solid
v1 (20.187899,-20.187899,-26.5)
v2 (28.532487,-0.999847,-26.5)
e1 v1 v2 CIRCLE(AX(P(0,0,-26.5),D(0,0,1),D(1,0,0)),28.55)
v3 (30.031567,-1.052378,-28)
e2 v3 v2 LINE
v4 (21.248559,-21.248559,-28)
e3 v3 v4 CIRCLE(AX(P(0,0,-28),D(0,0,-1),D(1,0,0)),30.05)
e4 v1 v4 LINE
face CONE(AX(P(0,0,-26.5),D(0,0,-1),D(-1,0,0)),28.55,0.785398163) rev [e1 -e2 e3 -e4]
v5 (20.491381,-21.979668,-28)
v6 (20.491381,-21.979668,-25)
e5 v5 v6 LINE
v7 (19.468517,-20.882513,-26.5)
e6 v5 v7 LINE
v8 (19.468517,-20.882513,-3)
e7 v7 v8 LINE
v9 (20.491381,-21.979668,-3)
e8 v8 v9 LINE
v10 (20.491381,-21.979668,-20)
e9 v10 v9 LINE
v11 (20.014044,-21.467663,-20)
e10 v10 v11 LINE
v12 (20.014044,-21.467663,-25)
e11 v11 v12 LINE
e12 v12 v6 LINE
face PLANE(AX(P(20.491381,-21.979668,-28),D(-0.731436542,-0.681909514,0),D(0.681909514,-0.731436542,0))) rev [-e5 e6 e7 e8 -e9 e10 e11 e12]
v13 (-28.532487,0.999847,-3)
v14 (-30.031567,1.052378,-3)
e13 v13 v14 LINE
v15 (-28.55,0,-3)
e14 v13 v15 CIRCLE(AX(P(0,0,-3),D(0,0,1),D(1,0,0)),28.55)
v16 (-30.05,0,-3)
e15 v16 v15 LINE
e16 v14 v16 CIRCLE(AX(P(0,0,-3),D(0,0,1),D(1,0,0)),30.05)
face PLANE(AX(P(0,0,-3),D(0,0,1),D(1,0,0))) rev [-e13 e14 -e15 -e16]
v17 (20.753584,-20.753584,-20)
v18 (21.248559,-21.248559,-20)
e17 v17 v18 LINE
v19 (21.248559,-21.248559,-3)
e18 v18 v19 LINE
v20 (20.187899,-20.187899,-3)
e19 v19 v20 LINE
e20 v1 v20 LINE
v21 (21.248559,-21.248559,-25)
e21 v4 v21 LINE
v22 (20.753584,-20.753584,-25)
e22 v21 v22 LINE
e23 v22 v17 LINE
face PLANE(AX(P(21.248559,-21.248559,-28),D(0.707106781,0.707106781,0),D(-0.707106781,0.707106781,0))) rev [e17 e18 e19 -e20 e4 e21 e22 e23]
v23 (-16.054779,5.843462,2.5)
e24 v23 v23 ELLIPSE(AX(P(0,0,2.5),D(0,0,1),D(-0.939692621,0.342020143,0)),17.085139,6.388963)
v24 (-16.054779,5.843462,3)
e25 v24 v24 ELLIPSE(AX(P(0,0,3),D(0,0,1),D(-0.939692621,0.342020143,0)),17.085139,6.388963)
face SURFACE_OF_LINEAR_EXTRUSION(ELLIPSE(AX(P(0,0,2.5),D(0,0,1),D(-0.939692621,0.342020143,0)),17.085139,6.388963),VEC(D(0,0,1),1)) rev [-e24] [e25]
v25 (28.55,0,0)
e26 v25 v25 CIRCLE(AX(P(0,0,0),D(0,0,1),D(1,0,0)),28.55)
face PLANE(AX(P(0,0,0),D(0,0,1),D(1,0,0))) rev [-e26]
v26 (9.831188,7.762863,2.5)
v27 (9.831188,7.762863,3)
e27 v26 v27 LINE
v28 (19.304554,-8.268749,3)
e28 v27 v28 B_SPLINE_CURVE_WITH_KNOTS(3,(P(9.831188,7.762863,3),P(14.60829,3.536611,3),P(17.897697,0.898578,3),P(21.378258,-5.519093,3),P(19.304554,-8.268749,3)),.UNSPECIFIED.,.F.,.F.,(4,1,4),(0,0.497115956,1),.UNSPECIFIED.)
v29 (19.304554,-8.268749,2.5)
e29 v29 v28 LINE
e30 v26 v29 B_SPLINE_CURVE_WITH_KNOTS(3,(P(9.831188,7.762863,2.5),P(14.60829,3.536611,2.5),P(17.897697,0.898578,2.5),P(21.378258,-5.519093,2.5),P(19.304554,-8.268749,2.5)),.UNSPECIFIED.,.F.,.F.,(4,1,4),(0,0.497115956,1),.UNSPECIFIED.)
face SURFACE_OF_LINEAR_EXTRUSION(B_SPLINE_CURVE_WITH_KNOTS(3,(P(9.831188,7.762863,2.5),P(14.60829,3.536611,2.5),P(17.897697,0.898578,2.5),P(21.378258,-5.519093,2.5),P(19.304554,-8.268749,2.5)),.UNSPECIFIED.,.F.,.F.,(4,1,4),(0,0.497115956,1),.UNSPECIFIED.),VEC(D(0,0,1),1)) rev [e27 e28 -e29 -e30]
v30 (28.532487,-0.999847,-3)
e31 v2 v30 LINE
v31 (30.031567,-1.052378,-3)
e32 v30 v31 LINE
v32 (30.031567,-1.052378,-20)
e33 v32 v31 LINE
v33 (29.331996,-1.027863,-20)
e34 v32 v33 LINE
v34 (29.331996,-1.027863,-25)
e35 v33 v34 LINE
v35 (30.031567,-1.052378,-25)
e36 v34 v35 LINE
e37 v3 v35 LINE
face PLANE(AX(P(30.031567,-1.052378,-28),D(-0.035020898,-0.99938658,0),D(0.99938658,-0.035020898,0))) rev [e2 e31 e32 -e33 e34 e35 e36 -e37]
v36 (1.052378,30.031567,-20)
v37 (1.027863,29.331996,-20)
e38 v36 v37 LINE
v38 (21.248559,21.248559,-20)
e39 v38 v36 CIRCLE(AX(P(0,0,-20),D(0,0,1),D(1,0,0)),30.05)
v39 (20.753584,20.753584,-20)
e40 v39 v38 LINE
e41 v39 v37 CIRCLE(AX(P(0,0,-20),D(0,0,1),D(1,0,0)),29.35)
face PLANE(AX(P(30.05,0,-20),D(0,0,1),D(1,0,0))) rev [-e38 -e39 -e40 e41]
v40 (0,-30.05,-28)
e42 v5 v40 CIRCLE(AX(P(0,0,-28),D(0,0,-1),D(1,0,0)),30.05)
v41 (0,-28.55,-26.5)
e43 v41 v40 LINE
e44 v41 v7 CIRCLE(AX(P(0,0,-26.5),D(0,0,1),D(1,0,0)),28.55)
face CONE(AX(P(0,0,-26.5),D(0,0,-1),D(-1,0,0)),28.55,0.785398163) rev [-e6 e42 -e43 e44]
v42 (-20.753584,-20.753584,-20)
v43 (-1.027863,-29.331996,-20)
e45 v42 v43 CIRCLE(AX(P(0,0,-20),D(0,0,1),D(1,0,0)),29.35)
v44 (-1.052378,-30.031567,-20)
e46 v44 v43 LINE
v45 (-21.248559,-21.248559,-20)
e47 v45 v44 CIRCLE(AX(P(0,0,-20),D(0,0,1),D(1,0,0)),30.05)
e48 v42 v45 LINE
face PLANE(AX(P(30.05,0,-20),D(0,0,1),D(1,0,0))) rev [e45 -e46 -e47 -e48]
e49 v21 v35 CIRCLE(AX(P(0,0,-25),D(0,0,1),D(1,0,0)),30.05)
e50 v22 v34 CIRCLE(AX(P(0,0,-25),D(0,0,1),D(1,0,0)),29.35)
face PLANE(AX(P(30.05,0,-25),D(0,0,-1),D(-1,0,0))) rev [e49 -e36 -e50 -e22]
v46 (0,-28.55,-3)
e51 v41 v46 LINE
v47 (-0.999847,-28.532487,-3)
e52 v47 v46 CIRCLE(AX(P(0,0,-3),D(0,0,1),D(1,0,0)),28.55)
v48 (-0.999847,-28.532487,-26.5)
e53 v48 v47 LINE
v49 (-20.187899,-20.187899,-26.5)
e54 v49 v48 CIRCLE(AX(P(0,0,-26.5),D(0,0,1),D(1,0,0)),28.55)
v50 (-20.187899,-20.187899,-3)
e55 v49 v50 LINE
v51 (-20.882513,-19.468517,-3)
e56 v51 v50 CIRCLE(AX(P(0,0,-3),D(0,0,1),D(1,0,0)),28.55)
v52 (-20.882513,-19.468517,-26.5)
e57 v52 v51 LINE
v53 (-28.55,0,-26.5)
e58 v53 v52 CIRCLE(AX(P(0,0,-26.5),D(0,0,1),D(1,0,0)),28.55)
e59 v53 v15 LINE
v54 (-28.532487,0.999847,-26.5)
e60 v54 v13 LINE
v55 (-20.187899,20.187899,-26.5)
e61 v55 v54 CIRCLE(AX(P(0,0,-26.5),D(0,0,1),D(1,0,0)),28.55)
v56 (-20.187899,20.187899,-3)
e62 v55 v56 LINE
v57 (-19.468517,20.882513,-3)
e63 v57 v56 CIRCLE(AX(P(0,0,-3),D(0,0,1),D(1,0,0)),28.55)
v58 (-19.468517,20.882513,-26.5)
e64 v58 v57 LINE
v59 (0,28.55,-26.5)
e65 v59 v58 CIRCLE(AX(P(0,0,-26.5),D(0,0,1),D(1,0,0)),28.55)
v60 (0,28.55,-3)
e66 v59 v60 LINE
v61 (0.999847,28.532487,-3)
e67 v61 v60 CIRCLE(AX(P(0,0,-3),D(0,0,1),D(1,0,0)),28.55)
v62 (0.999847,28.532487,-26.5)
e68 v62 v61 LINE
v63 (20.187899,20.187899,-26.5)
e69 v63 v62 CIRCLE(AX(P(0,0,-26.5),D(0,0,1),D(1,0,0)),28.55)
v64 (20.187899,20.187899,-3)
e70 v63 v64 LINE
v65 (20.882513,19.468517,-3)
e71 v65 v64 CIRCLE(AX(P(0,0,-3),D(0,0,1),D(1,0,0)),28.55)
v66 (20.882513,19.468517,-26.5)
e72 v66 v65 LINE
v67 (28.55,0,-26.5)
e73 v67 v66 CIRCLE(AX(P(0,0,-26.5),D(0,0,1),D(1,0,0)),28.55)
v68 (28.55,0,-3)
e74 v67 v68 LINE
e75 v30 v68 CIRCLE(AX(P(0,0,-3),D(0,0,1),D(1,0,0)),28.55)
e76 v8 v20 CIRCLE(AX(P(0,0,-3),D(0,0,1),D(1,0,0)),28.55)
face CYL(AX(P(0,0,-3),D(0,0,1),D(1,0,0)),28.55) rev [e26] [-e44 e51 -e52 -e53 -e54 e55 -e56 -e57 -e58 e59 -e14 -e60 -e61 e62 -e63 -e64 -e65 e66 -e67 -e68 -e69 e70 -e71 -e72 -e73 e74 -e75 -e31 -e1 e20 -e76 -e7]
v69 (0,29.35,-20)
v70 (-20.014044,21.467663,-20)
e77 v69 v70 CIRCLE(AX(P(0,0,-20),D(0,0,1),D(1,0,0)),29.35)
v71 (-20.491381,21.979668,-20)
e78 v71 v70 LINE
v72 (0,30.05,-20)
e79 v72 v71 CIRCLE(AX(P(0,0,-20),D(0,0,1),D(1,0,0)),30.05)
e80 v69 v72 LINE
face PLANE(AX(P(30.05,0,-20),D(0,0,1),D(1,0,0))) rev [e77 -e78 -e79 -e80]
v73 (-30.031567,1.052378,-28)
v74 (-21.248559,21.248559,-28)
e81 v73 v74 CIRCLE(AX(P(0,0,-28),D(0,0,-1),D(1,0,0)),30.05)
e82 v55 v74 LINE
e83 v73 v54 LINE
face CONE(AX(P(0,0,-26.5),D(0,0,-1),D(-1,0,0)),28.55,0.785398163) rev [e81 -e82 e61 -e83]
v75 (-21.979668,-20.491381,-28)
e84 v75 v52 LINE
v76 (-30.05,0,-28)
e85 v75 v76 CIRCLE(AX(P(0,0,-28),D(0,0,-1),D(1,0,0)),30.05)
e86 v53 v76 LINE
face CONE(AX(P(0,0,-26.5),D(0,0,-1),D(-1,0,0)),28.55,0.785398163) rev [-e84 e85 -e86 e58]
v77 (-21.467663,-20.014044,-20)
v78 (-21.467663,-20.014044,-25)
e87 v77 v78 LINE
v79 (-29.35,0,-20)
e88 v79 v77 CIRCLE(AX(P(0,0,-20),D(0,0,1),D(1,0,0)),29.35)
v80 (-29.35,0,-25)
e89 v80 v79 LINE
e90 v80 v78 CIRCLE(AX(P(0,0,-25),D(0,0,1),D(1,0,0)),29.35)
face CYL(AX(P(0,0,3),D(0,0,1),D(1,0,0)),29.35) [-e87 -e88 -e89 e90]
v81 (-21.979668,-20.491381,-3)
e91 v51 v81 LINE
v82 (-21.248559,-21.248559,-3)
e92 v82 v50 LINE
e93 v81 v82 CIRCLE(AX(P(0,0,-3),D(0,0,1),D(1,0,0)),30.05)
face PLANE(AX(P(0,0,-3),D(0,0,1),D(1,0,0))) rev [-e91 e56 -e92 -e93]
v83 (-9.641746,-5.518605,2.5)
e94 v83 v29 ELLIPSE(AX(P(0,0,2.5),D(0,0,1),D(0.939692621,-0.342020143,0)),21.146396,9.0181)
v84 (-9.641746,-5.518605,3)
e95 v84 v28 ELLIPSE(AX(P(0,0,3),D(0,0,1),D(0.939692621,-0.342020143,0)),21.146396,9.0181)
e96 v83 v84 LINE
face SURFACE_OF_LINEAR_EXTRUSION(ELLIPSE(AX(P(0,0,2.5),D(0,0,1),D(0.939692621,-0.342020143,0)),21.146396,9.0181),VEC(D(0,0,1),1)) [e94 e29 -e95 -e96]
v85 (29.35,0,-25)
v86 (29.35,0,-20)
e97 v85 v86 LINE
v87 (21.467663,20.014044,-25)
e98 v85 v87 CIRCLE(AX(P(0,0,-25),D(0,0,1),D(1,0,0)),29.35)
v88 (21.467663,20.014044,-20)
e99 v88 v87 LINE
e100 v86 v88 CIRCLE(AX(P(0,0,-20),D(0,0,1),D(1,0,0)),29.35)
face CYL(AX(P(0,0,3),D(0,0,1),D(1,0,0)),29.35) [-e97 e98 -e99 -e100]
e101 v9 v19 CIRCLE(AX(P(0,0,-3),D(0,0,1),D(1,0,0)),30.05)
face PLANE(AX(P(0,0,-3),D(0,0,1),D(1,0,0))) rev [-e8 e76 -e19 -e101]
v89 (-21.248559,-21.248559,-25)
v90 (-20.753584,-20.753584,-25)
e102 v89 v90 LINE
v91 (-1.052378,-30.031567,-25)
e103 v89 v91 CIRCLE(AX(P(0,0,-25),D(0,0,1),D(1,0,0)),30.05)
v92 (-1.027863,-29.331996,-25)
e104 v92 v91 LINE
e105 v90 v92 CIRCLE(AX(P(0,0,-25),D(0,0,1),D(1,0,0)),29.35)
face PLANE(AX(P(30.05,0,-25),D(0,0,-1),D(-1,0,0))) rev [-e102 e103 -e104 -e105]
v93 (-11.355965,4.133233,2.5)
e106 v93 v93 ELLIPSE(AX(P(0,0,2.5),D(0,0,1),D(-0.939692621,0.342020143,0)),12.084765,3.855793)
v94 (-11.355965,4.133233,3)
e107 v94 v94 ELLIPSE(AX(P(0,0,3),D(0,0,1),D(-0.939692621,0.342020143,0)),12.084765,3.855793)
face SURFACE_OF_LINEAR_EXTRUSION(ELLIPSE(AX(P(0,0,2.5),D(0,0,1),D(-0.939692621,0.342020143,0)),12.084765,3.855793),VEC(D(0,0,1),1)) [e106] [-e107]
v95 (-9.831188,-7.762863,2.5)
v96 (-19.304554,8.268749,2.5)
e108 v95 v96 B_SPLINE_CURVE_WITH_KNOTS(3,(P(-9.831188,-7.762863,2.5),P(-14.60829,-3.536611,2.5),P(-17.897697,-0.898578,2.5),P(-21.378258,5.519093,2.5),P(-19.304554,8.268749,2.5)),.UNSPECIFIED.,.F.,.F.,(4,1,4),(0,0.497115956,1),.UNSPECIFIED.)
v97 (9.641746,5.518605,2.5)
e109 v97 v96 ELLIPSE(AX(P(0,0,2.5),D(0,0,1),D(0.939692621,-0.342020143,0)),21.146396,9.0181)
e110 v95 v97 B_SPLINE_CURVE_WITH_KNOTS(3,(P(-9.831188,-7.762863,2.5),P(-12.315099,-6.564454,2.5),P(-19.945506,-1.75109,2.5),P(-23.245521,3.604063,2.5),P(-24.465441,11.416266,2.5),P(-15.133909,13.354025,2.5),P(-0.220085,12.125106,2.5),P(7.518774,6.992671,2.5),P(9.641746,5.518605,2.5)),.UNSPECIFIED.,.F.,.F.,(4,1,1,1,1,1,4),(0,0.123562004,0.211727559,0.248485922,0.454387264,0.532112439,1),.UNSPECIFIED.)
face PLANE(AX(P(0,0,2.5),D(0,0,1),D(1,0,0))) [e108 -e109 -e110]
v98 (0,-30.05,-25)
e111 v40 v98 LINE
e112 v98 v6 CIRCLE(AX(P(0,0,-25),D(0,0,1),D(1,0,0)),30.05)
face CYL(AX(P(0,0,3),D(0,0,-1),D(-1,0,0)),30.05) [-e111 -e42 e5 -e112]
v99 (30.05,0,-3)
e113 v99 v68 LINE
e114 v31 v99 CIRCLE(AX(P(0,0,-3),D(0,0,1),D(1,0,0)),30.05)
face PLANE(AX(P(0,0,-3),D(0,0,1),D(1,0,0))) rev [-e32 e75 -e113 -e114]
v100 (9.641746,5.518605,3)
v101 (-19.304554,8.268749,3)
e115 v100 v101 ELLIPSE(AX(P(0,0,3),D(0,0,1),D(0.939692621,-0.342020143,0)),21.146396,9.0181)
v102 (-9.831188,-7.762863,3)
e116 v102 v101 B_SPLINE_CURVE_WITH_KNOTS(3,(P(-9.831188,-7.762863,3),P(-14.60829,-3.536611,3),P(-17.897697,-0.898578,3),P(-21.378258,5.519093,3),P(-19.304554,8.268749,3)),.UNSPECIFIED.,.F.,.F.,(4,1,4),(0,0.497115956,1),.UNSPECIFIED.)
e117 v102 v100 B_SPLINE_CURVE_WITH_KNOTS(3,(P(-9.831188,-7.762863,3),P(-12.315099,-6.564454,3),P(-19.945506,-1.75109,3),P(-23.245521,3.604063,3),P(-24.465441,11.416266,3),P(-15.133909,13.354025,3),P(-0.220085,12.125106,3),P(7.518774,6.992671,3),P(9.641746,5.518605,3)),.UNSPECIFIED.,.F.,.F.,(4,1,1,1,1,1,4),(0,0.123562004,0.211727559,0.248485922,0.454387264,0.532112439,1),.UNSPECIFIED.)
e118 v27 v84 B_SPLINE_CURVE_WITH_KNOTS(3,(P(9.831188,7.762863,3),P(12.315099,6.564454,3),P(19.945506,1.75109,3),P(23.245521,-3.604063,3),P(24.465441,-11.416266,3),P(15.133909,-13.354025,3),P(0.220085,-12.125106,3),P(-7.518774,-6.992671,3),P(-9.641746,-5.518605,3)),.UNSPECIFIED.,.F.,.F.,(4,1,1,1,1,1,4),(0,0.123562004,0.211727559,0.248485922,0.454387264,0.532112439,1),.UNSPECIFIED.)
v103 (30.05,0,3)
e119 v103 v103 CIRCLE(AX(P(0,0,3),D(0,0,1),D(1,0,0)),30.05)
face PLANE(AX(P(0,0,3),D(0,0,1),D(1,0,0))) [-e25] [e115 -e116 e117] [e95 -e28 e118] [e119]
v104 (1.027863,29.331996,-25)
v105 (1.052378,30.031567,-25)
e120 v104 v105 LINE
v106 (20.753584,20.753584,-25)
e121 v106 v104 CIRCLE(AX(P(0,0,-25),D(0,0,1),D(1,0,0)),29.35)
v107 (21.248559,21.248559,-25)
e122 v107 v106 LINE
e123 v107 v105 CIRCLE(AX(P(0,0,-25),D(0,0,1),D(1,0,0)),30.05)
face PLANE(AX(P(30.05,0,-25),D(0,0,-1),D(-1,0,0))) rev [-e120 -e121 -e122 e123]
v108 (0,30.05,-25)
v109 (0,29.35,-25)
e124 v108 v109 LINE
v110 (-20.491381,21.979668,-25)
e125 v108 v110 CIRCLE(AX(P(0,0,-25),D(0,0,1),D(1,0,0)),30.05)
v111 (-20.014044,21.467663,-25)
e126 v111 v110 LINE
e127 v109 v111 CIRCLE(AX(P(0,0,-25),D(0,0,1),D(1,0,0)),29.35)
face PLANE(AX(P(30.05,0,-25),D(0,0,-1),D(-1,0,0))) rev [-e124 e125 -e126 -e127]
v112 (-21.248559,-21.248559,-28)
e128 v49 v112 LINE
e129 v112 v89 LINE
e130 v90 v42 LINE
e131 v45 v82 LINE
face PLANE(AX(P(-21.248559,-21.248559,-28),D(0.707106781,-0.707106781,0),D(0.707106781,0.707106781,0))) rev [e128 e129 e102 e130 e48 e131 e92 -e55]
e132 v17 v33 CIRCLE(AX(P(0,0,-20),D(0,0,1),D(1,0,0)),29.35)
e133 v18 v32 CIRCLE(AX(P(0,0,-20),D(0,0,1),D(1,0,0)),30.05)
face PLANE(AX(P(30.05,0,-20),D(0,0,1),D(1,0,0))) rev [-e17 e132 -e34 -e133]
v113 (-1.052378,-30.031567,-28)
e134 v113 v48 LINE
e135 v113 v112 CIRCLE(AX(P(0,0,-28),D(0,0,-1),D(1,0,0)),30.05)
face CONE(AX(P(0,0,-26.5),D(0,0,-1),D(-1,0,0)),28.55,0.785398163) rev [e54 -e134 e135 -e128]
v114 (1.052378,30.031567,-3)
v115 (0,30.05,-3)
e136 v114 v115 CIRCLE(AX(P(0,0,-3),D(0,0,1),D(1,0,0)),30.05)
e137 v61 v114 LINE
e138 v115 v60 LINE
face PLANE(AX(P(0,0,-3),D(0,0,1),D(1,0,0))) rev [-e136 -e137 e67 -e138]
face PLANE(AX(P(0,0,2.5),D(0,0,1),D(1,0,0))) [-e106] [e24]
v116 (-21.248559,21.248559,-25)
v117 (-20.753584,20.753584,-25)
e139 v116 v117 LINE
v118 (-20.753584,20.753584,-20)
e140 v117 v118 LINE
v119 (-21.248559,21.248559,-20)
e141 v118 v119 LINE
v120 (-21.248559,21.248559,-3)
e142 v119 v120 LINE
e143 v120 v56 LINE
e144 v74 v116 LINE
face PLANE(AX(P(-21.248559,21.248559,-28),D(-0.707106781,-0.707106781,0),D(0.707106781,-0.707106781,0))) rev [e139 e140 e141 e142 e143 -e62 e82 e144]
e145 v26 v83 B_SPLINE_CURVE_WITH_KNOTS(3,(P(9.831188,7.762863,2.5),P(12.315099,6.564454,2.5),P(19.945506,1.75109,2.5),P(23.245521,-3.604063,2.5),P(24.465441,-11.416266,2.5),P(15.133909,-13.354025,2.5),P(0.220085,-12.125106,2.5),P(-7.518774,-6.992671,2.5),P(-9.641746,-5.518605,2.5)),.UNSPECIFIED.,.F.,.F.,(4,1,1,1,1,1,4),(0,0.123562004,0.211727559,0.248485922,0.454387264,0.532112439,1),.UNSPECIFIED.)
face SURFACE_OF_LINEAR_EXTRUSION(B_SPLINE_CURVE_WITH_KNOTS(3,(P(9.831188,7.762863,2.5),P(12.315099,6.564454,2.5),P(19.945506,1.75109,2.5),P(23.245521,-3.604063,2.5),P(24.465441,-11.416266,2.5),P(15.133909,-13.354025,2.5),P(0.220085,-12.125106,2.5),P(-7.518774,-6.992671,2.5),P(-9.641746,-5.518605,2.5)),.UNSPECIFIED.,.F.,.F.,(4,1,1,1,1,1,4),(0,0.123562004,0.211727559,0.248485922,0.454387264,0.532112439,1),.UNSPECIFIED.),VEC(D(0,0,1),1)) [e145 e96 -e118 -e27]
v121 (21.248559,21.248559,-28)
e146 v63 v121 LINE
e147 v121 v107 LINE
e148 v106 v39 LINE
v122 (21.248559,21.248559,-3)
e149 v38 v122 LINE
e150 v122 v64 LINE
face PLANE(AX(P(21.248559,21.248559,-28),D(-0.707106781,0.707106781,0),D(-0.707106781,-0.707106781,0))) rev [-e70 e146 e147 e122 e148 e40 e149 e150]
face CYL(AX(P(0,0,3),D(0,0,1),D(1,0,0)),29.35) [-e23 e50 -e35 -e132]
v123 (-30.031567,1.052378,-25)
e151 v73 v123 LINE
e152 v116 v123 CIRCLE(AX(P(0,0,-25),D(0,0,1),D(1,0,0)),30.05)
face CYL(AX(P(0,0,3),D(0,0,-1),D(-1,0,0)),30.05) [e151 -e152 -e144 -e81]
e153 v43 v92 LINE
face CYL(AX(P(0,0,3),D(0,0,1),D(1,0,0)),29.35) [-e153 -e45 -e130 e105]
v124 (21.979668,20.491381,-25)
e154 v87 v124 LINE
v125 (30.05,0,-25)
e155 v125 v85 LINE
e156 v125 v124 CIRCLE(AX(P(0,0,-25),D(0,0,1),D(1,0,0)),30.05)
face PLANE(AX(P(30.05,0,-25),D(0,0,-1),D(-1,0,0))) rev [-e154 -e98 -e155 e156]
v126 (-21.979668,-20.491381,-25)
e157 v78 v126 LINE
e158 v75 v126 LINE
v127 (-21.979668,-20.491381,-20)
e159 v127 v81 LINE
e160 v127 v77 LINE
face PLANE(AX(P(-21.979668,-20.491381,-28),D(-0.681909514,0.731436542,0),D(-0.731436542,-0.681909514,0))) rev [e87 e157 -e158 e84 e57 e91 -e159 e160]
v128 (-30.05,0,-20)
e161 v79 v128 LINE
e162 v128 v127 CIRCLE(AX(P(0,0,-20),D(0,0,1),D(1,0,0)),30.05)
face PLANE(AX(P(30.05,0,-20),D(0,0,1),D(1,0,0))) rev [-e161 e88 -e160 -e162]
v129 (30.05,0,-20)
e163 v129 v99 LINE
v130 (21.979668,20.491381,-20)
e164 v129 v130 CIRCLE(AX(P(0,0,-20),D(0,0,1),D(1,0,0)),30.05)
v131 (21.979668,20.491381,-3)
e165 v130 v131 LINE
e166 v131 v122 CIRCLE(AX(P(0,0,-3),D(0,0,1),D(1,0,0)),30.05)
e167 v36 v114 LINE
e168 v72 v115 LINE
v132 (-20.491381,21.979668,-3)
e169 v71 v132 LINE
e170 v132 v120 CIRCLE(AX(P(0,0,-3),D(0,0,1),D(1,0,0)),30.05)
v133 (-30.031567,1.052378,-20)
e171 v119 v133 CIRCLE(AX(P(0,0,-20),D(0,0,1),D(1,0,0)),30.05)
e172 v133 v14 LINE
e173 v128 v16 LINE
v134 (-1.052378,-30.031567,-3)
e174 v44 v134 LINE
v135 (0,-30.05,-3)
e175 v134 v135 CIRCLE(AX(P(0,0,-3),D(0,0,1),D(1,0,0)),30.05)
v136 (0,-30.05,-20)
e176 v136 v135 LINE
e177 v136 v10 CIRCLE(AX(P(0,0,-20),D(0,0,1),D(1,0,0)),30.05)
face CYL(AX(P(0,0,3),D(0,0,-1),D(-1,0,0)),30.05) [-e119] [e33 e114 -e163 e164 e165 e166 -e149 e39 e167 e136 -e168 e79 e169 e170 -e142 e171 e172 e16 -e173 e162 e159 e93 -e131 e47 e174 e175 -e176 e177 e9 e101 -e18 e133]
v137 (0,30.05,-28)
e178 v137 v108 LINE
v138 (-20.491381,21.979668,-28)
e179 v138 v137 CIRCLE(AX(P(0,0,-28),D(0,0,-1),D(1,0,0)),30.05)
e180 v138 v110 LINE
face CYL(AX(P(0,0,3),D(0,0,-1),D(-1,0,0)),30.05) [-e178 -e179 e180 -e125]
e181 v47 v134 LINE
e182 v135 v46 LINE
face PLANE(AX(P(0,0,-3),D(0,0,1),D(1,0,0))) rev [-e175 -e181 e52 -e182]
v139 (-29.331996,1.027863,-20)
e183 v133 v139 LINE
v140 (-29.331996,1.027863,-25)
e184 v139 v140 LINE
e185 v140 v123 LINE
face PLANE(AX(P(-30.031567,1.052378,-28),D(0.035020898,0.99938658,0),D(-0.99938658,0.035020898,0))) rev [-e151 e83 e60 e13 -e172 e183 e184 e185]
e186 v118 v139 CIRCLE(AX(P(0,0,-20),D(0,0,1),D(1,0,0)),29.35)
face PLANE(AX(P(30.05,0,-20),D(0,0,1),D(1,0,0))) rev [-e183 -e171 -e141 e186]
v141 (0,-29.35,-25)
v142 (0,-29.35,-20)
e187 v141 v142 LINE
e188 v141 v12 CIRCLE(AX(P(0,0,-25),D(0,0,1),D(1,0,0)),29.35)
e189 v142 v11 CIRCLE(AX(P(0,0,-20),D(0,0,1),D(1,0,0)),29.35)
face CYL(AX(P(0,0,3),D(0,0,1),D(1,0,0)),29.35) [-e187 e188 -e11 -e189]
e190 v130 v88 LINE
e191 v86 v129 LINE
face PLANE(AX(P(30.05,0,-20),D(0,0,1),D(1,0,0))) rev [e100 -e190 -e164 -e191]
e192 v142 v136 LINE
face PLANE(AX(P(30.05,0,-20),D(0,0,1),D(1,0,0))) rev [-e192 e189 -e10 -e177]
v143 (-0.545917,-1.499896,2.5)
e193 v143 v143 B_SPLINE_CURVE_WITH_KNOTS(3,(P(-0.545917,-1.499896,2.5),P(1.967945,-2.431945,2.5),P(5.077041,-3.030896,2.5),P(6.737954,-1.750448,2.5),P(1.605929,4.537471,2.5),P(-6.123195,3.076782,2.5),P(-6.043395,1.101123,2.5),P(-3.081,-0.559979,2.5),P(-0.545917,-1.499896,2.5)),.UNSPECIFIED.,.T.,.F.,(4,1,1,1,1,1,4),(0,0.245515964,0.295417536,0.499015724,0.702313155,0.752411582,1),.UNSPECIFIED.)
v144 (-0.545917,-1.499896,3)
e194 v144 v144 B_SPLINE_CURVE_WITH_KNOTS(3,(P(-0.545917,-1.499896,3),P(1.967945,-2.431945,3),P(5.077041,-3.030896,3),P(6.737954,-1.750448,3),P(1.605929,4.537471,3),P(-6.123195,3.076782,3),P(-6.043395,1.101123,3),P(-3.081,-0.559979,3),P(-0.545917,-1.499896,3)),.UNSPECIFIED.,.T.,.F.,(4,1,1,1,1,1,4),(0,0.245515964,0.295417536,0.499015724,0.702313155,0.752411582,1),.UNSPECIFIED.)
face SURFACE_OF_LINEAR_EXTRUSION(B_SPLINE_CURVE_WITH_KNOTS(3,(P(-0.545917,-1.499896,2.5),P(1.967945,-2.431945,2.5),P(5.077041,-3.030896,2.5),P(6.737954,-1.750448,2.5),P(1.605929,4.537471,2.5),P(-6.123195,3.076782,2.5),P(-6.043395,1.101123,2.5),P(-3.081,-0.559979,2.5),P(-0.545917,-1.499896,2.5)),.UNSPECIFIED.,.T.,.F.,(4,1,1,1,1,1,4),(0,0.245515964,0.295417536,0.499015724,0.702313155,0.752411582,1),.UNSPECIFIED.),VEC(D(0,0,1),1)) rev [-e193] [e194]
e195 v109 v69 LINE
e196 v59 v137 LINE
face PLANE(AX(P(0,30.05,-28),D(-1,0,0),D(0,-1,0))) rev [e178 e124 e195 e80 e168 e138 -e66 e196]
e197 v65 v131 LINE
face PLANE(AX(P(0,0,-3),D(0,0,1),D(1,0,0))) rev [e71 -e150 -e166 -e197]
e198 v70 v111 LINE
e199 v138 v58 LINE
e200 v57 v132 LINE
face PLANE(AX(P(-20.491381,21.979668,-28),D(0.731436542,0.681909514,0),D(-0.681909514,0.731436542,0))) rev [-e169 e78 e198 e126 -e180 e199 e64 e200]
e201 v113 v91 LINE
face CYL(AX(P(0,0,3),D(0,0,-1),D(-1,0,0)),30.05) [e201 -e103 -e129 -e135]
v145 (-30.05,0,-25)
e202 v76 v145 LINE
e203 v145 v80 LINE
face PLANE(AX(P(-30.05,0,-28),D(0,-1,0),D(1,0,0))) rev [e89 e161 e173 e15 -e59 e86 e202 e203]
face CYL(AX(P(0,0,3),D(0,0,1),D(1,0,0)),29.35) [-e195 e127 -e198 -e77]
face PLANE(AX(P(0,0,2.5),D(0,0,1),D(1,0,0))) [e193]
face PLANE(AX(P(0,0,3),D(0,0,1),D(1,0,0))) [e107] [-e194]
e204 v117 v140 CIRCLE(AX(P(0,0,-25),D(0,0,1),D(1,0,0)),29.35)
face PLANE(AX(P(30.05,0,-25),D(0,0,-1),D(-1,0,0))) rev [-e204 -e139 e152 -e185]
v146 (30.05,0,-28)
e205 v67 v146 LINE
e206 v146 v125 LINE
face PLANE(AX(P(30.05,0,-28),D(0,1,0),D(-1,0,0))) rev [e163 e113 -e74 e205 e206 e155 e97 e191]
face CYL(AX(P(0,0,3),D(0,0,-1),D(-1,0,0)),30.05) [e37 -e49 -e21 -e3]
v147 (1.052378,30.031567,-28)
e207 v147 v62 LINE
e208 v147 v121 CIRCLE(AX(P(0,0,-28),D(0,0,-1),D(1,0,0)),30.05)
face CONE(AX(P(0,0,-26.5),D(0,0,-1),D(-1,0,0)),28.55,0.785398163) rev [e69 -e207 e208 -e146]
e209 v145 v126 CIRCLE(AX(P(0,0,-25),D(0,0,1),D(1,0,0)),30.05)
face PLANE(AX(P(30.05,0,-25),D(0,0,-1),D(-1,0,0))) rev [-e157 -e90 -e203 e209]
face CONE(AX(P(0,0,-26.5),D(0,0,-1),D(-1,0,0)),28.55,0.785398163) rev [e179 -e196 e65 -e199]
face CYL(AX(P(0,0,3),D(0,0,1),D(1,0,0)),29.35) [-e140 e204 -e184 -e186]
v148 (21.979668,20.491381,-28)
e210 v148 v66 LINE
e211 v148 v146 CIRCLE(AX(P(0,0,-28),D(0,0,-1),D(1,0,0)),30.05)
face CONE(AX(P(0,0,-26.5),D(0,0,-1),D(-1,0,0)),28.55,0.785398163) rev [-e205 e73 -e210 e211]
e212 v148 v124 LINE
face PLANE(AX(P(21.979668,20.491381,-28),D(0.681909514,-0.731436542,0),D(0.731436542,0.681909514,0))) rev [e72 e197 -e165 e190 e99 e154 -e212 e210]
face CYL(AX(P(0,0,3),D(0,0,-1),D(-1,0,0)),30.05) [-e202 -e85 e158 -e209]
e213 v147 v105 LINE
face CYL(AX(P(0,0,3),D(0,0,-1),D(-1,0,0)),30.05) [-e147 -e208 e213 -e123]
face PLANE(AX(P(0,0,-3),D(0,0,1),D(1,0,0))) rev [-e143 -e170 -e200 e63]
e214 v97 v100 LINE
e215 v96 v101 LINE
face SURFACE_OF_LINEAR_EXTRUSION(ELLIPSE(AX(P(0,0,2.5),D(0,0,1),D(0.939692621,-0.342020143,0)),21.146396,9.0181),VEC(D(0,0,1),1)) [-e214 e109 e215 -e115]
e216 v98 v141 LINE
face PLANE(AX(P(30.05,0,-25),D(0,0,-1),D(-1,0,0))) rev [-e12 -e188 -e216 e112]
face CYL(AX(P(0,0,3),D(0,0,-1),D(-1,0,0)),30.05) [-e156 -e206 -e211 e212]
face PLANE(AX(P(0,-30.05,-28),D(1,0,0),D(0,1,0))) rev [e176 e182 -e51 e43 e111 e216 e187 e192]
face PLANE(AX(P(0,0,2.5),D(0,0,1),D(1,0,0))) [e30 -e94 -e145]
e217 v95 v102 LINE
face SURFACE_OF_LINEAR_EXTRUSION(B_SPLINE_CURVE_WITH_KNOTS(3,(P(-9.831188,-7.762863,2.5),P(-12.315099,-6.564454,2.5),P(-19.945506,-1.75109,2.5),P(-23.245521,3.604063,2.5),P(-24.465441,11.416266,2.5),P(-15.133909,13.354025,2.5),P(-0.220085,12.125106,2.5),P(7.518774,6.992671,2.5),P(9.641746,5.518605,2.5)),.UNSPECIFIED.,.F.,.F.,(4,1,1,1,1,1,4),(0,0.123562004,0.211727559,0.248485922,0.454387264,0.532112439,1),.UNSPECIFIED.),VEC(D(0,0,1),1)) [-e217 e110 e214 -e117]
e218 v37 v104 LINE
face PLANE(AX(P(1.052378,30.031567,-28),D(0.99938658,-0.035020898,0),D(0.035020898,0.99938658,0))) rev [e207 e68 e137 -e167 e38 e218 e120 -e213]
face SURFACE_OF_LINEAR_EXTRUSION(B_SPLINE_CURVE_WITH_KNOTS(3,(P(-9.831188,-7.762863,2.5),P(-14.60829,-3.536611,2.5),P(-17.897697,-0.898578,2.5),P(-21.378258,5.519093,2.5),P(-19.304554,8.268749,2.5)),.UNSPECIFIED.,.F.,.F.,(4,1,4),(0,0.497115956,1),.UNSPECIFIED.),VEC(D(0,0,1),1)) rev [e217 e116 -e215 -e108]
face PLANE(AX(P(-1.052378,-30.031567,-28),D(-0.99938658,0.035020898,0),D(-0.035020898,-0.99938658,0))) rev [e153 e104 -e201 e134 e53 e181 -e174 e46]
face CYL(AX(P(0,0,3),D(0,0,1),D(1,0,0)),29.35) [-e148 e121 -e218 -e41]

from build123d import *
from build123d.topology import SkipClean

# Parameters (mm, degrees)
SKETCH1_R           = 30.05
SKETCH1_R_2         = 28.55
BOSS_EXTRUDE1_DEPTH = 3
BOSS_EXTRUDE2_START = -3
SKETCH1_3_R         = 30.05
SKETCH1_3_R_2       = 28.55
BOSS_EXTRUDE2_DEPTH = 3
BOSS_EXTRUDE3_START = 25
BOSS_EXTRUDE3_DEPTH = 25
SKETCH4_W           = 0.7
SKETCH4_H           = 5
CUT_EXTRUDE1_START  = -0.5
CUT_EXTRUDE1_DEPTH  = 0.5


# Read off the part's stored shape, not the designer's step: Cut-Extrude1
with BuildPart() as part:
    # Sketch1 → Boss-Extrude1 (new body)
    # profile 1 of 2: a face of its own
    with BuildSketch(Plane.XY):
        Circle(SKETCH1_R)
        Circle(SKETCH1_R_2, mode=Mode.SUBTRACT)
    # profile 2 of 2: a face of its own
    with BuildSketch(Plane.XY):
        Circle(SKETCH1_R_2)
    extrude(amount=BOSS_EXTRUDE1_DEPTH)

    # Sketch1<3> → Boss-Extrude2 (add)
    with BuildSketch(Plane.XY.offset(BOSS_EXTRUDE2_START)):
        Circle(SKETCH1_3_R)
        Circle(SKETCH1_3_R_2, mode=Mode.SUBTRACT)
    extrude(amount=BOSS_EXTRUDE2_DEPTH)

    # Sketch3 → Boss-Extrude3 (add)
    with SkipClean():  # the faces are left unmerged after this step: merging them gives an invalid solid
        with BuildSketch(Plane(origin=(0, 0, -3), x_dir=(-1, 0, 0), z_dir=(0, 0, -1)).offset(BOSS_EXTRUDE3_START)):
            with BuildLine():
                Line((20.491380882, 21.979668094), (19.468516612, 20.882513281))
                ThreePointArc((19.468516612, 20.882513281), (10.461996603, 26.564057052), (0, 28.55))
                Line((0, 28.55), (0, 30.05))
                ThreePointArc((0, 30.05), (11.011663675, 27.959716793), (20.491380882, 21.979668094))
            make_face()
            with BuildLine():
                Line((30.031566735, 1.05237798), (28.532486865, 0.999846633))
                ThreePointArc((28.532486865, 0.999846633), (26.18137362, 11.385876135), (20.187898603, 20.187898603))
                Line((20.187898603, 20.187898603), (21.248558775, 21.248558775))
                ThreePointArc((21.248558775, 21.248558775), (27.5569274, 11.984083288), (30.031566735, 1.05237798))
            make_face()
            with BuildLine():
                Line((21.979668094, -20.491380882), (20.882513281, -19.468516612))
                ThreePointArc((20.882513281, -19.468516612), (26.564057052, -10.461996603), (28.55, 0))
                Line((28.55, 0), (30.05, 0))
                ThreePointArc((30.05, 0), (27.959716793, -11.011663675), (21.979668094, -20.491380882))
            make_face()
            with BuildLine():
                Line((1.05237798, -30.031566735), (0.999846633, -28.532486865))
                ThreePointArc((0.999846633, -28.532486865), (11.385876135, -26.18137362), (20.187898603, -20.187898603))
                Line((20.187898603, -20.187898603), (21.248558775, -21.248558775))
                ThreePointArc((21.248558775, -21.248558775), (11.984083288, -27.5569274), (1.05237798, -30.031566735))
            make_face()
            with BuildLine():
                Line((-20.491380882, -21.979668094), (-19.468516612, -20.882513281))
                ThreePointArc((-19.468516612, -20.882513281), (-10.461996603, -26.564057052), (0, -28.55))
                Line((0, -28.55), (0, -30.05))
                ThreePointArc((0, -30.05), (-11.011663675, -27.959716793), (-20.491380882, -21.979668094))
            make_face()
            with BuildLine():
                Line((-30.031566735, -1.05237798), (-28.532486865, -0.999846633))
                ThreePointArc((-28.532486865, -0.999846633), (-26.18137362, -11.385876135), (-20.187898603, -20.187898603))
                Line((-20.187898603, -20.187898603), (-21.248558775, -21.248558775))
                ThreePointArc((-21.248558775, -21.248558775), (-27.5569274, -11.984083288), (-30.031566735, -1.05237798))
            make_face()
            with BuildLine():
                Line((-21.979668094, 20.491380882), (-20.882513281, 19.468516612))
                ThreePointArc((-20.882513281, 19.468516612), (-26.564057052, 10.461996603), (-28.55, 0))
                Line((-28.55, 0), (-30.05, 0))
                ThreePointArc((-30.05, 0), (-27.959716793, 11.011663675), (-21.979668094, 20.491380882))
            make_face()
            with BuildLine():
                Line((-1.05237798, 30.031566735), (-0.999846633, 28.532486865))
                ThreePointArc((-0.999846633, 28.532486865), (-11.385876135, 26.18137362), (-20.187898603, 20.187898603))
                Line((-20.187898603, 20.187898603), (-21.248558775, 21.248558775))
                ThreePointArc((-21.248558775, 21.248558775), (-11.984083288, 27.5569274), (-1.05237798, 30.031566735))
            make_face()
        extrude(amount=-BOSS_EXTRUDE3_DEPTH)

    # Sketch4 → Cut-Revolve1 (revolve, cut)
    with SkipClean():  # the faces are left unmerged after this step: merging them gives an invalid solid
        with BuildSketch(Plane(origin=(0, 0, 0), x_dir=(1, 0, 0), z_dir=(0, 1, 0))):
            with Locations((29.7, 22.5)):
                Rectangle(SKETCH4_W, SKETCH4_H)
            Polygon((28.55, 26.5), (28.55, 28), (30.05, 28), align=None)
        revolve(axis=Axis((0, 0, 3), (0, 0, -1)), mode=Mode.SUBTRACT)

    # Cut-Extrude1 outline → Cut-Extrude1 (cut)
    # profile 1 of 4: a face of its own
    with SkipClean():  # the faces are left unmerged after this step: merging them gives an invalid solid
        with BuildSketch(Plane.XY.offset(3).offset(CUT_EXTRUDE1_START)):
            with BuildLine():
                add(Edge.make_bspline(
                    [(-9.831188481, -7.76286267), (-12.31509908, -6.564453694), (-19.945506052, -1.751090116), (-23.245520708, 3.604062551), (-24.465440518, 11.416266415), (-15.133909058, 13.3540246), (-0.220085461, 12.125105625), (7.518774259, 6.992670667), (9.641745648, 5.518604803)],
                    knots=[0, 0, 0, 0, 0.123562004, 0.211727559, 0.248485922, 0.454387264, 0.532112439, 1, 1, 1, 1], degree=3))
                add(Edge.make_bspline(
                    [(-9.831188481, -7.76286267), (-14.608290319, -3.536611009), (-17.897696817, -0.898578419), (-21.378258226, 5.519092244), (-19.304554183, 8.268748828)],
                    knots=[0, 0, 0, 0, 0.497115956, 0.99999998, 0.99999998, 0.99999998, 0.99999998], degree=3))
                add(Edge.make_bspline(
                    [(9.641745648, 5.518604803), (-12.302292658, 17.553494797), (-19.304554183, 8.268748828)],
                    knots=[1.224732712, 1.224732712, 1.224732712, 3.011762383, 3.011762383, 3.011762383], degree=2, weights=[1, 0.626676865, 1]))
            make_face()
        # profile 2 of 4: a face of its own
        with BuildSketch(Plane.XY.offset(3).offset(CUT_EXTRUDE1_START)):
            with BuildLine():
                add(Edge.make_bspline(
                    [(9.831188481, 7.76286267), (12.31509908, 6.564453694), (19.945506052, 1.751090116), (23.245520708, -3.604062551), (24.465440518, -11.416266415), (15.133909058, -13.3540246), (0.220085461, -12.125105625), (-7.518774259, -6.992670667), (-9.641745648, -5.518604803)],
                    knots=[0, 0, 0, 0, 0.123562004, 0.211727559, 0.248485922, 0.454387264, 0.532112439, 1, 1, 1, 1], degree=3))
                add(Edge.make_bspline(
                    [(9.831188481, 7.76286267), (14.608290319, 3.536611009), (17.897696883, 0.898578367), (21.378258365, -5.5190925), (19.304553936, -8.268749156)],
                    knots=[0, 0, 0, 0, 0.497115956, 1, 1, 1, 1], degree=3))
                add(Edge.make_bspline(
                    [(-9.641745648, -5.518604803), (12.302291673, -17.553494257), (19.304553936, -8.268749156)],
                    knots=[4.366325366, 4.366325366, 4.366325366, 6.153354993, 6.153354993, 6.153354993], degree=2, weights=[1, 0.626676882, 1]))
            make_face()
        # profile 3 of 4: a face of its own
        with BuildSketch(Plane.XY.offset(3).offset(CUT_EXTRUDE1_START)):
            with BuildLine():
                add(Edge.make_bspline(
                    [(-16.054779318, 5.843461789), (-19.839576992, -4.555184358), (6.134990822, -8.121053968), (32.109558636, -11.686923579), (9.919788496, 2.277592179), (-12.269981644, 16.242107937), (-16.054779318, 5.843461789)],
                    knots=[0, 0, 0, 2.094395102, 2.094395102, 4.188790205, 4.188790205, 6.283185307, 6.283185307, 6.283185307], degree=2, weights=[1, 0.5, 1, 0.5, 1, 0.5, 1]))
            make_face()
            with BuildLine():
                add(Edge.make_bspline(
                    [(-11.355964711, 4.133233136), (-13.640122053, -2.142437584), (4.535903685, -5.204451928), (22.711929422, -8.266466273), (6.820061027, 1.071218792), (-9.071807369, 10.408903856), (-11.355964711, 4.133233136)],
                    knots=[0, 0, 0, 2.094395102, 2.094395102, 4.188790205, 4.188790205, 6.283185307, 6.283185307, 6.283185307], degree=2, weights=[1, 0.5, 1, 0.5, 1, 0.5, 1]))
            make_face(mode=Mode.SUBTRACT)
        # profile 4 of 4: a face of its own
        with BuildSketch(Plane.XY.offset(3).offset(CUT_EXTRUDE1_START)):
            with BuildLine():
                add(Edge.make_bspline(
                    [(-0.545917498, -1.499895999), (1.967945144, -2.431945071), (5.077041498, -3.030895568), (6.737953902, -1.750447632), (1.605929106, 4.537470773), (-6.123195001, 3.076782229), (-6.04339485, 1.101123427), (-3.081000207, -0.559979297), (-0.545917498, -1.499895999)],
                    knots=[0, 0, 0, 0, 0.245515964, 0.295417536, 0.499015724, 0.702313155, 0.752411582, 1, 1, 1, 1], degree=3))
            make_face()
        extrude(amount=CUT_EXTRUDE1_DEPTH, mode=Mode.SUBTRACT)


solid = part.part
